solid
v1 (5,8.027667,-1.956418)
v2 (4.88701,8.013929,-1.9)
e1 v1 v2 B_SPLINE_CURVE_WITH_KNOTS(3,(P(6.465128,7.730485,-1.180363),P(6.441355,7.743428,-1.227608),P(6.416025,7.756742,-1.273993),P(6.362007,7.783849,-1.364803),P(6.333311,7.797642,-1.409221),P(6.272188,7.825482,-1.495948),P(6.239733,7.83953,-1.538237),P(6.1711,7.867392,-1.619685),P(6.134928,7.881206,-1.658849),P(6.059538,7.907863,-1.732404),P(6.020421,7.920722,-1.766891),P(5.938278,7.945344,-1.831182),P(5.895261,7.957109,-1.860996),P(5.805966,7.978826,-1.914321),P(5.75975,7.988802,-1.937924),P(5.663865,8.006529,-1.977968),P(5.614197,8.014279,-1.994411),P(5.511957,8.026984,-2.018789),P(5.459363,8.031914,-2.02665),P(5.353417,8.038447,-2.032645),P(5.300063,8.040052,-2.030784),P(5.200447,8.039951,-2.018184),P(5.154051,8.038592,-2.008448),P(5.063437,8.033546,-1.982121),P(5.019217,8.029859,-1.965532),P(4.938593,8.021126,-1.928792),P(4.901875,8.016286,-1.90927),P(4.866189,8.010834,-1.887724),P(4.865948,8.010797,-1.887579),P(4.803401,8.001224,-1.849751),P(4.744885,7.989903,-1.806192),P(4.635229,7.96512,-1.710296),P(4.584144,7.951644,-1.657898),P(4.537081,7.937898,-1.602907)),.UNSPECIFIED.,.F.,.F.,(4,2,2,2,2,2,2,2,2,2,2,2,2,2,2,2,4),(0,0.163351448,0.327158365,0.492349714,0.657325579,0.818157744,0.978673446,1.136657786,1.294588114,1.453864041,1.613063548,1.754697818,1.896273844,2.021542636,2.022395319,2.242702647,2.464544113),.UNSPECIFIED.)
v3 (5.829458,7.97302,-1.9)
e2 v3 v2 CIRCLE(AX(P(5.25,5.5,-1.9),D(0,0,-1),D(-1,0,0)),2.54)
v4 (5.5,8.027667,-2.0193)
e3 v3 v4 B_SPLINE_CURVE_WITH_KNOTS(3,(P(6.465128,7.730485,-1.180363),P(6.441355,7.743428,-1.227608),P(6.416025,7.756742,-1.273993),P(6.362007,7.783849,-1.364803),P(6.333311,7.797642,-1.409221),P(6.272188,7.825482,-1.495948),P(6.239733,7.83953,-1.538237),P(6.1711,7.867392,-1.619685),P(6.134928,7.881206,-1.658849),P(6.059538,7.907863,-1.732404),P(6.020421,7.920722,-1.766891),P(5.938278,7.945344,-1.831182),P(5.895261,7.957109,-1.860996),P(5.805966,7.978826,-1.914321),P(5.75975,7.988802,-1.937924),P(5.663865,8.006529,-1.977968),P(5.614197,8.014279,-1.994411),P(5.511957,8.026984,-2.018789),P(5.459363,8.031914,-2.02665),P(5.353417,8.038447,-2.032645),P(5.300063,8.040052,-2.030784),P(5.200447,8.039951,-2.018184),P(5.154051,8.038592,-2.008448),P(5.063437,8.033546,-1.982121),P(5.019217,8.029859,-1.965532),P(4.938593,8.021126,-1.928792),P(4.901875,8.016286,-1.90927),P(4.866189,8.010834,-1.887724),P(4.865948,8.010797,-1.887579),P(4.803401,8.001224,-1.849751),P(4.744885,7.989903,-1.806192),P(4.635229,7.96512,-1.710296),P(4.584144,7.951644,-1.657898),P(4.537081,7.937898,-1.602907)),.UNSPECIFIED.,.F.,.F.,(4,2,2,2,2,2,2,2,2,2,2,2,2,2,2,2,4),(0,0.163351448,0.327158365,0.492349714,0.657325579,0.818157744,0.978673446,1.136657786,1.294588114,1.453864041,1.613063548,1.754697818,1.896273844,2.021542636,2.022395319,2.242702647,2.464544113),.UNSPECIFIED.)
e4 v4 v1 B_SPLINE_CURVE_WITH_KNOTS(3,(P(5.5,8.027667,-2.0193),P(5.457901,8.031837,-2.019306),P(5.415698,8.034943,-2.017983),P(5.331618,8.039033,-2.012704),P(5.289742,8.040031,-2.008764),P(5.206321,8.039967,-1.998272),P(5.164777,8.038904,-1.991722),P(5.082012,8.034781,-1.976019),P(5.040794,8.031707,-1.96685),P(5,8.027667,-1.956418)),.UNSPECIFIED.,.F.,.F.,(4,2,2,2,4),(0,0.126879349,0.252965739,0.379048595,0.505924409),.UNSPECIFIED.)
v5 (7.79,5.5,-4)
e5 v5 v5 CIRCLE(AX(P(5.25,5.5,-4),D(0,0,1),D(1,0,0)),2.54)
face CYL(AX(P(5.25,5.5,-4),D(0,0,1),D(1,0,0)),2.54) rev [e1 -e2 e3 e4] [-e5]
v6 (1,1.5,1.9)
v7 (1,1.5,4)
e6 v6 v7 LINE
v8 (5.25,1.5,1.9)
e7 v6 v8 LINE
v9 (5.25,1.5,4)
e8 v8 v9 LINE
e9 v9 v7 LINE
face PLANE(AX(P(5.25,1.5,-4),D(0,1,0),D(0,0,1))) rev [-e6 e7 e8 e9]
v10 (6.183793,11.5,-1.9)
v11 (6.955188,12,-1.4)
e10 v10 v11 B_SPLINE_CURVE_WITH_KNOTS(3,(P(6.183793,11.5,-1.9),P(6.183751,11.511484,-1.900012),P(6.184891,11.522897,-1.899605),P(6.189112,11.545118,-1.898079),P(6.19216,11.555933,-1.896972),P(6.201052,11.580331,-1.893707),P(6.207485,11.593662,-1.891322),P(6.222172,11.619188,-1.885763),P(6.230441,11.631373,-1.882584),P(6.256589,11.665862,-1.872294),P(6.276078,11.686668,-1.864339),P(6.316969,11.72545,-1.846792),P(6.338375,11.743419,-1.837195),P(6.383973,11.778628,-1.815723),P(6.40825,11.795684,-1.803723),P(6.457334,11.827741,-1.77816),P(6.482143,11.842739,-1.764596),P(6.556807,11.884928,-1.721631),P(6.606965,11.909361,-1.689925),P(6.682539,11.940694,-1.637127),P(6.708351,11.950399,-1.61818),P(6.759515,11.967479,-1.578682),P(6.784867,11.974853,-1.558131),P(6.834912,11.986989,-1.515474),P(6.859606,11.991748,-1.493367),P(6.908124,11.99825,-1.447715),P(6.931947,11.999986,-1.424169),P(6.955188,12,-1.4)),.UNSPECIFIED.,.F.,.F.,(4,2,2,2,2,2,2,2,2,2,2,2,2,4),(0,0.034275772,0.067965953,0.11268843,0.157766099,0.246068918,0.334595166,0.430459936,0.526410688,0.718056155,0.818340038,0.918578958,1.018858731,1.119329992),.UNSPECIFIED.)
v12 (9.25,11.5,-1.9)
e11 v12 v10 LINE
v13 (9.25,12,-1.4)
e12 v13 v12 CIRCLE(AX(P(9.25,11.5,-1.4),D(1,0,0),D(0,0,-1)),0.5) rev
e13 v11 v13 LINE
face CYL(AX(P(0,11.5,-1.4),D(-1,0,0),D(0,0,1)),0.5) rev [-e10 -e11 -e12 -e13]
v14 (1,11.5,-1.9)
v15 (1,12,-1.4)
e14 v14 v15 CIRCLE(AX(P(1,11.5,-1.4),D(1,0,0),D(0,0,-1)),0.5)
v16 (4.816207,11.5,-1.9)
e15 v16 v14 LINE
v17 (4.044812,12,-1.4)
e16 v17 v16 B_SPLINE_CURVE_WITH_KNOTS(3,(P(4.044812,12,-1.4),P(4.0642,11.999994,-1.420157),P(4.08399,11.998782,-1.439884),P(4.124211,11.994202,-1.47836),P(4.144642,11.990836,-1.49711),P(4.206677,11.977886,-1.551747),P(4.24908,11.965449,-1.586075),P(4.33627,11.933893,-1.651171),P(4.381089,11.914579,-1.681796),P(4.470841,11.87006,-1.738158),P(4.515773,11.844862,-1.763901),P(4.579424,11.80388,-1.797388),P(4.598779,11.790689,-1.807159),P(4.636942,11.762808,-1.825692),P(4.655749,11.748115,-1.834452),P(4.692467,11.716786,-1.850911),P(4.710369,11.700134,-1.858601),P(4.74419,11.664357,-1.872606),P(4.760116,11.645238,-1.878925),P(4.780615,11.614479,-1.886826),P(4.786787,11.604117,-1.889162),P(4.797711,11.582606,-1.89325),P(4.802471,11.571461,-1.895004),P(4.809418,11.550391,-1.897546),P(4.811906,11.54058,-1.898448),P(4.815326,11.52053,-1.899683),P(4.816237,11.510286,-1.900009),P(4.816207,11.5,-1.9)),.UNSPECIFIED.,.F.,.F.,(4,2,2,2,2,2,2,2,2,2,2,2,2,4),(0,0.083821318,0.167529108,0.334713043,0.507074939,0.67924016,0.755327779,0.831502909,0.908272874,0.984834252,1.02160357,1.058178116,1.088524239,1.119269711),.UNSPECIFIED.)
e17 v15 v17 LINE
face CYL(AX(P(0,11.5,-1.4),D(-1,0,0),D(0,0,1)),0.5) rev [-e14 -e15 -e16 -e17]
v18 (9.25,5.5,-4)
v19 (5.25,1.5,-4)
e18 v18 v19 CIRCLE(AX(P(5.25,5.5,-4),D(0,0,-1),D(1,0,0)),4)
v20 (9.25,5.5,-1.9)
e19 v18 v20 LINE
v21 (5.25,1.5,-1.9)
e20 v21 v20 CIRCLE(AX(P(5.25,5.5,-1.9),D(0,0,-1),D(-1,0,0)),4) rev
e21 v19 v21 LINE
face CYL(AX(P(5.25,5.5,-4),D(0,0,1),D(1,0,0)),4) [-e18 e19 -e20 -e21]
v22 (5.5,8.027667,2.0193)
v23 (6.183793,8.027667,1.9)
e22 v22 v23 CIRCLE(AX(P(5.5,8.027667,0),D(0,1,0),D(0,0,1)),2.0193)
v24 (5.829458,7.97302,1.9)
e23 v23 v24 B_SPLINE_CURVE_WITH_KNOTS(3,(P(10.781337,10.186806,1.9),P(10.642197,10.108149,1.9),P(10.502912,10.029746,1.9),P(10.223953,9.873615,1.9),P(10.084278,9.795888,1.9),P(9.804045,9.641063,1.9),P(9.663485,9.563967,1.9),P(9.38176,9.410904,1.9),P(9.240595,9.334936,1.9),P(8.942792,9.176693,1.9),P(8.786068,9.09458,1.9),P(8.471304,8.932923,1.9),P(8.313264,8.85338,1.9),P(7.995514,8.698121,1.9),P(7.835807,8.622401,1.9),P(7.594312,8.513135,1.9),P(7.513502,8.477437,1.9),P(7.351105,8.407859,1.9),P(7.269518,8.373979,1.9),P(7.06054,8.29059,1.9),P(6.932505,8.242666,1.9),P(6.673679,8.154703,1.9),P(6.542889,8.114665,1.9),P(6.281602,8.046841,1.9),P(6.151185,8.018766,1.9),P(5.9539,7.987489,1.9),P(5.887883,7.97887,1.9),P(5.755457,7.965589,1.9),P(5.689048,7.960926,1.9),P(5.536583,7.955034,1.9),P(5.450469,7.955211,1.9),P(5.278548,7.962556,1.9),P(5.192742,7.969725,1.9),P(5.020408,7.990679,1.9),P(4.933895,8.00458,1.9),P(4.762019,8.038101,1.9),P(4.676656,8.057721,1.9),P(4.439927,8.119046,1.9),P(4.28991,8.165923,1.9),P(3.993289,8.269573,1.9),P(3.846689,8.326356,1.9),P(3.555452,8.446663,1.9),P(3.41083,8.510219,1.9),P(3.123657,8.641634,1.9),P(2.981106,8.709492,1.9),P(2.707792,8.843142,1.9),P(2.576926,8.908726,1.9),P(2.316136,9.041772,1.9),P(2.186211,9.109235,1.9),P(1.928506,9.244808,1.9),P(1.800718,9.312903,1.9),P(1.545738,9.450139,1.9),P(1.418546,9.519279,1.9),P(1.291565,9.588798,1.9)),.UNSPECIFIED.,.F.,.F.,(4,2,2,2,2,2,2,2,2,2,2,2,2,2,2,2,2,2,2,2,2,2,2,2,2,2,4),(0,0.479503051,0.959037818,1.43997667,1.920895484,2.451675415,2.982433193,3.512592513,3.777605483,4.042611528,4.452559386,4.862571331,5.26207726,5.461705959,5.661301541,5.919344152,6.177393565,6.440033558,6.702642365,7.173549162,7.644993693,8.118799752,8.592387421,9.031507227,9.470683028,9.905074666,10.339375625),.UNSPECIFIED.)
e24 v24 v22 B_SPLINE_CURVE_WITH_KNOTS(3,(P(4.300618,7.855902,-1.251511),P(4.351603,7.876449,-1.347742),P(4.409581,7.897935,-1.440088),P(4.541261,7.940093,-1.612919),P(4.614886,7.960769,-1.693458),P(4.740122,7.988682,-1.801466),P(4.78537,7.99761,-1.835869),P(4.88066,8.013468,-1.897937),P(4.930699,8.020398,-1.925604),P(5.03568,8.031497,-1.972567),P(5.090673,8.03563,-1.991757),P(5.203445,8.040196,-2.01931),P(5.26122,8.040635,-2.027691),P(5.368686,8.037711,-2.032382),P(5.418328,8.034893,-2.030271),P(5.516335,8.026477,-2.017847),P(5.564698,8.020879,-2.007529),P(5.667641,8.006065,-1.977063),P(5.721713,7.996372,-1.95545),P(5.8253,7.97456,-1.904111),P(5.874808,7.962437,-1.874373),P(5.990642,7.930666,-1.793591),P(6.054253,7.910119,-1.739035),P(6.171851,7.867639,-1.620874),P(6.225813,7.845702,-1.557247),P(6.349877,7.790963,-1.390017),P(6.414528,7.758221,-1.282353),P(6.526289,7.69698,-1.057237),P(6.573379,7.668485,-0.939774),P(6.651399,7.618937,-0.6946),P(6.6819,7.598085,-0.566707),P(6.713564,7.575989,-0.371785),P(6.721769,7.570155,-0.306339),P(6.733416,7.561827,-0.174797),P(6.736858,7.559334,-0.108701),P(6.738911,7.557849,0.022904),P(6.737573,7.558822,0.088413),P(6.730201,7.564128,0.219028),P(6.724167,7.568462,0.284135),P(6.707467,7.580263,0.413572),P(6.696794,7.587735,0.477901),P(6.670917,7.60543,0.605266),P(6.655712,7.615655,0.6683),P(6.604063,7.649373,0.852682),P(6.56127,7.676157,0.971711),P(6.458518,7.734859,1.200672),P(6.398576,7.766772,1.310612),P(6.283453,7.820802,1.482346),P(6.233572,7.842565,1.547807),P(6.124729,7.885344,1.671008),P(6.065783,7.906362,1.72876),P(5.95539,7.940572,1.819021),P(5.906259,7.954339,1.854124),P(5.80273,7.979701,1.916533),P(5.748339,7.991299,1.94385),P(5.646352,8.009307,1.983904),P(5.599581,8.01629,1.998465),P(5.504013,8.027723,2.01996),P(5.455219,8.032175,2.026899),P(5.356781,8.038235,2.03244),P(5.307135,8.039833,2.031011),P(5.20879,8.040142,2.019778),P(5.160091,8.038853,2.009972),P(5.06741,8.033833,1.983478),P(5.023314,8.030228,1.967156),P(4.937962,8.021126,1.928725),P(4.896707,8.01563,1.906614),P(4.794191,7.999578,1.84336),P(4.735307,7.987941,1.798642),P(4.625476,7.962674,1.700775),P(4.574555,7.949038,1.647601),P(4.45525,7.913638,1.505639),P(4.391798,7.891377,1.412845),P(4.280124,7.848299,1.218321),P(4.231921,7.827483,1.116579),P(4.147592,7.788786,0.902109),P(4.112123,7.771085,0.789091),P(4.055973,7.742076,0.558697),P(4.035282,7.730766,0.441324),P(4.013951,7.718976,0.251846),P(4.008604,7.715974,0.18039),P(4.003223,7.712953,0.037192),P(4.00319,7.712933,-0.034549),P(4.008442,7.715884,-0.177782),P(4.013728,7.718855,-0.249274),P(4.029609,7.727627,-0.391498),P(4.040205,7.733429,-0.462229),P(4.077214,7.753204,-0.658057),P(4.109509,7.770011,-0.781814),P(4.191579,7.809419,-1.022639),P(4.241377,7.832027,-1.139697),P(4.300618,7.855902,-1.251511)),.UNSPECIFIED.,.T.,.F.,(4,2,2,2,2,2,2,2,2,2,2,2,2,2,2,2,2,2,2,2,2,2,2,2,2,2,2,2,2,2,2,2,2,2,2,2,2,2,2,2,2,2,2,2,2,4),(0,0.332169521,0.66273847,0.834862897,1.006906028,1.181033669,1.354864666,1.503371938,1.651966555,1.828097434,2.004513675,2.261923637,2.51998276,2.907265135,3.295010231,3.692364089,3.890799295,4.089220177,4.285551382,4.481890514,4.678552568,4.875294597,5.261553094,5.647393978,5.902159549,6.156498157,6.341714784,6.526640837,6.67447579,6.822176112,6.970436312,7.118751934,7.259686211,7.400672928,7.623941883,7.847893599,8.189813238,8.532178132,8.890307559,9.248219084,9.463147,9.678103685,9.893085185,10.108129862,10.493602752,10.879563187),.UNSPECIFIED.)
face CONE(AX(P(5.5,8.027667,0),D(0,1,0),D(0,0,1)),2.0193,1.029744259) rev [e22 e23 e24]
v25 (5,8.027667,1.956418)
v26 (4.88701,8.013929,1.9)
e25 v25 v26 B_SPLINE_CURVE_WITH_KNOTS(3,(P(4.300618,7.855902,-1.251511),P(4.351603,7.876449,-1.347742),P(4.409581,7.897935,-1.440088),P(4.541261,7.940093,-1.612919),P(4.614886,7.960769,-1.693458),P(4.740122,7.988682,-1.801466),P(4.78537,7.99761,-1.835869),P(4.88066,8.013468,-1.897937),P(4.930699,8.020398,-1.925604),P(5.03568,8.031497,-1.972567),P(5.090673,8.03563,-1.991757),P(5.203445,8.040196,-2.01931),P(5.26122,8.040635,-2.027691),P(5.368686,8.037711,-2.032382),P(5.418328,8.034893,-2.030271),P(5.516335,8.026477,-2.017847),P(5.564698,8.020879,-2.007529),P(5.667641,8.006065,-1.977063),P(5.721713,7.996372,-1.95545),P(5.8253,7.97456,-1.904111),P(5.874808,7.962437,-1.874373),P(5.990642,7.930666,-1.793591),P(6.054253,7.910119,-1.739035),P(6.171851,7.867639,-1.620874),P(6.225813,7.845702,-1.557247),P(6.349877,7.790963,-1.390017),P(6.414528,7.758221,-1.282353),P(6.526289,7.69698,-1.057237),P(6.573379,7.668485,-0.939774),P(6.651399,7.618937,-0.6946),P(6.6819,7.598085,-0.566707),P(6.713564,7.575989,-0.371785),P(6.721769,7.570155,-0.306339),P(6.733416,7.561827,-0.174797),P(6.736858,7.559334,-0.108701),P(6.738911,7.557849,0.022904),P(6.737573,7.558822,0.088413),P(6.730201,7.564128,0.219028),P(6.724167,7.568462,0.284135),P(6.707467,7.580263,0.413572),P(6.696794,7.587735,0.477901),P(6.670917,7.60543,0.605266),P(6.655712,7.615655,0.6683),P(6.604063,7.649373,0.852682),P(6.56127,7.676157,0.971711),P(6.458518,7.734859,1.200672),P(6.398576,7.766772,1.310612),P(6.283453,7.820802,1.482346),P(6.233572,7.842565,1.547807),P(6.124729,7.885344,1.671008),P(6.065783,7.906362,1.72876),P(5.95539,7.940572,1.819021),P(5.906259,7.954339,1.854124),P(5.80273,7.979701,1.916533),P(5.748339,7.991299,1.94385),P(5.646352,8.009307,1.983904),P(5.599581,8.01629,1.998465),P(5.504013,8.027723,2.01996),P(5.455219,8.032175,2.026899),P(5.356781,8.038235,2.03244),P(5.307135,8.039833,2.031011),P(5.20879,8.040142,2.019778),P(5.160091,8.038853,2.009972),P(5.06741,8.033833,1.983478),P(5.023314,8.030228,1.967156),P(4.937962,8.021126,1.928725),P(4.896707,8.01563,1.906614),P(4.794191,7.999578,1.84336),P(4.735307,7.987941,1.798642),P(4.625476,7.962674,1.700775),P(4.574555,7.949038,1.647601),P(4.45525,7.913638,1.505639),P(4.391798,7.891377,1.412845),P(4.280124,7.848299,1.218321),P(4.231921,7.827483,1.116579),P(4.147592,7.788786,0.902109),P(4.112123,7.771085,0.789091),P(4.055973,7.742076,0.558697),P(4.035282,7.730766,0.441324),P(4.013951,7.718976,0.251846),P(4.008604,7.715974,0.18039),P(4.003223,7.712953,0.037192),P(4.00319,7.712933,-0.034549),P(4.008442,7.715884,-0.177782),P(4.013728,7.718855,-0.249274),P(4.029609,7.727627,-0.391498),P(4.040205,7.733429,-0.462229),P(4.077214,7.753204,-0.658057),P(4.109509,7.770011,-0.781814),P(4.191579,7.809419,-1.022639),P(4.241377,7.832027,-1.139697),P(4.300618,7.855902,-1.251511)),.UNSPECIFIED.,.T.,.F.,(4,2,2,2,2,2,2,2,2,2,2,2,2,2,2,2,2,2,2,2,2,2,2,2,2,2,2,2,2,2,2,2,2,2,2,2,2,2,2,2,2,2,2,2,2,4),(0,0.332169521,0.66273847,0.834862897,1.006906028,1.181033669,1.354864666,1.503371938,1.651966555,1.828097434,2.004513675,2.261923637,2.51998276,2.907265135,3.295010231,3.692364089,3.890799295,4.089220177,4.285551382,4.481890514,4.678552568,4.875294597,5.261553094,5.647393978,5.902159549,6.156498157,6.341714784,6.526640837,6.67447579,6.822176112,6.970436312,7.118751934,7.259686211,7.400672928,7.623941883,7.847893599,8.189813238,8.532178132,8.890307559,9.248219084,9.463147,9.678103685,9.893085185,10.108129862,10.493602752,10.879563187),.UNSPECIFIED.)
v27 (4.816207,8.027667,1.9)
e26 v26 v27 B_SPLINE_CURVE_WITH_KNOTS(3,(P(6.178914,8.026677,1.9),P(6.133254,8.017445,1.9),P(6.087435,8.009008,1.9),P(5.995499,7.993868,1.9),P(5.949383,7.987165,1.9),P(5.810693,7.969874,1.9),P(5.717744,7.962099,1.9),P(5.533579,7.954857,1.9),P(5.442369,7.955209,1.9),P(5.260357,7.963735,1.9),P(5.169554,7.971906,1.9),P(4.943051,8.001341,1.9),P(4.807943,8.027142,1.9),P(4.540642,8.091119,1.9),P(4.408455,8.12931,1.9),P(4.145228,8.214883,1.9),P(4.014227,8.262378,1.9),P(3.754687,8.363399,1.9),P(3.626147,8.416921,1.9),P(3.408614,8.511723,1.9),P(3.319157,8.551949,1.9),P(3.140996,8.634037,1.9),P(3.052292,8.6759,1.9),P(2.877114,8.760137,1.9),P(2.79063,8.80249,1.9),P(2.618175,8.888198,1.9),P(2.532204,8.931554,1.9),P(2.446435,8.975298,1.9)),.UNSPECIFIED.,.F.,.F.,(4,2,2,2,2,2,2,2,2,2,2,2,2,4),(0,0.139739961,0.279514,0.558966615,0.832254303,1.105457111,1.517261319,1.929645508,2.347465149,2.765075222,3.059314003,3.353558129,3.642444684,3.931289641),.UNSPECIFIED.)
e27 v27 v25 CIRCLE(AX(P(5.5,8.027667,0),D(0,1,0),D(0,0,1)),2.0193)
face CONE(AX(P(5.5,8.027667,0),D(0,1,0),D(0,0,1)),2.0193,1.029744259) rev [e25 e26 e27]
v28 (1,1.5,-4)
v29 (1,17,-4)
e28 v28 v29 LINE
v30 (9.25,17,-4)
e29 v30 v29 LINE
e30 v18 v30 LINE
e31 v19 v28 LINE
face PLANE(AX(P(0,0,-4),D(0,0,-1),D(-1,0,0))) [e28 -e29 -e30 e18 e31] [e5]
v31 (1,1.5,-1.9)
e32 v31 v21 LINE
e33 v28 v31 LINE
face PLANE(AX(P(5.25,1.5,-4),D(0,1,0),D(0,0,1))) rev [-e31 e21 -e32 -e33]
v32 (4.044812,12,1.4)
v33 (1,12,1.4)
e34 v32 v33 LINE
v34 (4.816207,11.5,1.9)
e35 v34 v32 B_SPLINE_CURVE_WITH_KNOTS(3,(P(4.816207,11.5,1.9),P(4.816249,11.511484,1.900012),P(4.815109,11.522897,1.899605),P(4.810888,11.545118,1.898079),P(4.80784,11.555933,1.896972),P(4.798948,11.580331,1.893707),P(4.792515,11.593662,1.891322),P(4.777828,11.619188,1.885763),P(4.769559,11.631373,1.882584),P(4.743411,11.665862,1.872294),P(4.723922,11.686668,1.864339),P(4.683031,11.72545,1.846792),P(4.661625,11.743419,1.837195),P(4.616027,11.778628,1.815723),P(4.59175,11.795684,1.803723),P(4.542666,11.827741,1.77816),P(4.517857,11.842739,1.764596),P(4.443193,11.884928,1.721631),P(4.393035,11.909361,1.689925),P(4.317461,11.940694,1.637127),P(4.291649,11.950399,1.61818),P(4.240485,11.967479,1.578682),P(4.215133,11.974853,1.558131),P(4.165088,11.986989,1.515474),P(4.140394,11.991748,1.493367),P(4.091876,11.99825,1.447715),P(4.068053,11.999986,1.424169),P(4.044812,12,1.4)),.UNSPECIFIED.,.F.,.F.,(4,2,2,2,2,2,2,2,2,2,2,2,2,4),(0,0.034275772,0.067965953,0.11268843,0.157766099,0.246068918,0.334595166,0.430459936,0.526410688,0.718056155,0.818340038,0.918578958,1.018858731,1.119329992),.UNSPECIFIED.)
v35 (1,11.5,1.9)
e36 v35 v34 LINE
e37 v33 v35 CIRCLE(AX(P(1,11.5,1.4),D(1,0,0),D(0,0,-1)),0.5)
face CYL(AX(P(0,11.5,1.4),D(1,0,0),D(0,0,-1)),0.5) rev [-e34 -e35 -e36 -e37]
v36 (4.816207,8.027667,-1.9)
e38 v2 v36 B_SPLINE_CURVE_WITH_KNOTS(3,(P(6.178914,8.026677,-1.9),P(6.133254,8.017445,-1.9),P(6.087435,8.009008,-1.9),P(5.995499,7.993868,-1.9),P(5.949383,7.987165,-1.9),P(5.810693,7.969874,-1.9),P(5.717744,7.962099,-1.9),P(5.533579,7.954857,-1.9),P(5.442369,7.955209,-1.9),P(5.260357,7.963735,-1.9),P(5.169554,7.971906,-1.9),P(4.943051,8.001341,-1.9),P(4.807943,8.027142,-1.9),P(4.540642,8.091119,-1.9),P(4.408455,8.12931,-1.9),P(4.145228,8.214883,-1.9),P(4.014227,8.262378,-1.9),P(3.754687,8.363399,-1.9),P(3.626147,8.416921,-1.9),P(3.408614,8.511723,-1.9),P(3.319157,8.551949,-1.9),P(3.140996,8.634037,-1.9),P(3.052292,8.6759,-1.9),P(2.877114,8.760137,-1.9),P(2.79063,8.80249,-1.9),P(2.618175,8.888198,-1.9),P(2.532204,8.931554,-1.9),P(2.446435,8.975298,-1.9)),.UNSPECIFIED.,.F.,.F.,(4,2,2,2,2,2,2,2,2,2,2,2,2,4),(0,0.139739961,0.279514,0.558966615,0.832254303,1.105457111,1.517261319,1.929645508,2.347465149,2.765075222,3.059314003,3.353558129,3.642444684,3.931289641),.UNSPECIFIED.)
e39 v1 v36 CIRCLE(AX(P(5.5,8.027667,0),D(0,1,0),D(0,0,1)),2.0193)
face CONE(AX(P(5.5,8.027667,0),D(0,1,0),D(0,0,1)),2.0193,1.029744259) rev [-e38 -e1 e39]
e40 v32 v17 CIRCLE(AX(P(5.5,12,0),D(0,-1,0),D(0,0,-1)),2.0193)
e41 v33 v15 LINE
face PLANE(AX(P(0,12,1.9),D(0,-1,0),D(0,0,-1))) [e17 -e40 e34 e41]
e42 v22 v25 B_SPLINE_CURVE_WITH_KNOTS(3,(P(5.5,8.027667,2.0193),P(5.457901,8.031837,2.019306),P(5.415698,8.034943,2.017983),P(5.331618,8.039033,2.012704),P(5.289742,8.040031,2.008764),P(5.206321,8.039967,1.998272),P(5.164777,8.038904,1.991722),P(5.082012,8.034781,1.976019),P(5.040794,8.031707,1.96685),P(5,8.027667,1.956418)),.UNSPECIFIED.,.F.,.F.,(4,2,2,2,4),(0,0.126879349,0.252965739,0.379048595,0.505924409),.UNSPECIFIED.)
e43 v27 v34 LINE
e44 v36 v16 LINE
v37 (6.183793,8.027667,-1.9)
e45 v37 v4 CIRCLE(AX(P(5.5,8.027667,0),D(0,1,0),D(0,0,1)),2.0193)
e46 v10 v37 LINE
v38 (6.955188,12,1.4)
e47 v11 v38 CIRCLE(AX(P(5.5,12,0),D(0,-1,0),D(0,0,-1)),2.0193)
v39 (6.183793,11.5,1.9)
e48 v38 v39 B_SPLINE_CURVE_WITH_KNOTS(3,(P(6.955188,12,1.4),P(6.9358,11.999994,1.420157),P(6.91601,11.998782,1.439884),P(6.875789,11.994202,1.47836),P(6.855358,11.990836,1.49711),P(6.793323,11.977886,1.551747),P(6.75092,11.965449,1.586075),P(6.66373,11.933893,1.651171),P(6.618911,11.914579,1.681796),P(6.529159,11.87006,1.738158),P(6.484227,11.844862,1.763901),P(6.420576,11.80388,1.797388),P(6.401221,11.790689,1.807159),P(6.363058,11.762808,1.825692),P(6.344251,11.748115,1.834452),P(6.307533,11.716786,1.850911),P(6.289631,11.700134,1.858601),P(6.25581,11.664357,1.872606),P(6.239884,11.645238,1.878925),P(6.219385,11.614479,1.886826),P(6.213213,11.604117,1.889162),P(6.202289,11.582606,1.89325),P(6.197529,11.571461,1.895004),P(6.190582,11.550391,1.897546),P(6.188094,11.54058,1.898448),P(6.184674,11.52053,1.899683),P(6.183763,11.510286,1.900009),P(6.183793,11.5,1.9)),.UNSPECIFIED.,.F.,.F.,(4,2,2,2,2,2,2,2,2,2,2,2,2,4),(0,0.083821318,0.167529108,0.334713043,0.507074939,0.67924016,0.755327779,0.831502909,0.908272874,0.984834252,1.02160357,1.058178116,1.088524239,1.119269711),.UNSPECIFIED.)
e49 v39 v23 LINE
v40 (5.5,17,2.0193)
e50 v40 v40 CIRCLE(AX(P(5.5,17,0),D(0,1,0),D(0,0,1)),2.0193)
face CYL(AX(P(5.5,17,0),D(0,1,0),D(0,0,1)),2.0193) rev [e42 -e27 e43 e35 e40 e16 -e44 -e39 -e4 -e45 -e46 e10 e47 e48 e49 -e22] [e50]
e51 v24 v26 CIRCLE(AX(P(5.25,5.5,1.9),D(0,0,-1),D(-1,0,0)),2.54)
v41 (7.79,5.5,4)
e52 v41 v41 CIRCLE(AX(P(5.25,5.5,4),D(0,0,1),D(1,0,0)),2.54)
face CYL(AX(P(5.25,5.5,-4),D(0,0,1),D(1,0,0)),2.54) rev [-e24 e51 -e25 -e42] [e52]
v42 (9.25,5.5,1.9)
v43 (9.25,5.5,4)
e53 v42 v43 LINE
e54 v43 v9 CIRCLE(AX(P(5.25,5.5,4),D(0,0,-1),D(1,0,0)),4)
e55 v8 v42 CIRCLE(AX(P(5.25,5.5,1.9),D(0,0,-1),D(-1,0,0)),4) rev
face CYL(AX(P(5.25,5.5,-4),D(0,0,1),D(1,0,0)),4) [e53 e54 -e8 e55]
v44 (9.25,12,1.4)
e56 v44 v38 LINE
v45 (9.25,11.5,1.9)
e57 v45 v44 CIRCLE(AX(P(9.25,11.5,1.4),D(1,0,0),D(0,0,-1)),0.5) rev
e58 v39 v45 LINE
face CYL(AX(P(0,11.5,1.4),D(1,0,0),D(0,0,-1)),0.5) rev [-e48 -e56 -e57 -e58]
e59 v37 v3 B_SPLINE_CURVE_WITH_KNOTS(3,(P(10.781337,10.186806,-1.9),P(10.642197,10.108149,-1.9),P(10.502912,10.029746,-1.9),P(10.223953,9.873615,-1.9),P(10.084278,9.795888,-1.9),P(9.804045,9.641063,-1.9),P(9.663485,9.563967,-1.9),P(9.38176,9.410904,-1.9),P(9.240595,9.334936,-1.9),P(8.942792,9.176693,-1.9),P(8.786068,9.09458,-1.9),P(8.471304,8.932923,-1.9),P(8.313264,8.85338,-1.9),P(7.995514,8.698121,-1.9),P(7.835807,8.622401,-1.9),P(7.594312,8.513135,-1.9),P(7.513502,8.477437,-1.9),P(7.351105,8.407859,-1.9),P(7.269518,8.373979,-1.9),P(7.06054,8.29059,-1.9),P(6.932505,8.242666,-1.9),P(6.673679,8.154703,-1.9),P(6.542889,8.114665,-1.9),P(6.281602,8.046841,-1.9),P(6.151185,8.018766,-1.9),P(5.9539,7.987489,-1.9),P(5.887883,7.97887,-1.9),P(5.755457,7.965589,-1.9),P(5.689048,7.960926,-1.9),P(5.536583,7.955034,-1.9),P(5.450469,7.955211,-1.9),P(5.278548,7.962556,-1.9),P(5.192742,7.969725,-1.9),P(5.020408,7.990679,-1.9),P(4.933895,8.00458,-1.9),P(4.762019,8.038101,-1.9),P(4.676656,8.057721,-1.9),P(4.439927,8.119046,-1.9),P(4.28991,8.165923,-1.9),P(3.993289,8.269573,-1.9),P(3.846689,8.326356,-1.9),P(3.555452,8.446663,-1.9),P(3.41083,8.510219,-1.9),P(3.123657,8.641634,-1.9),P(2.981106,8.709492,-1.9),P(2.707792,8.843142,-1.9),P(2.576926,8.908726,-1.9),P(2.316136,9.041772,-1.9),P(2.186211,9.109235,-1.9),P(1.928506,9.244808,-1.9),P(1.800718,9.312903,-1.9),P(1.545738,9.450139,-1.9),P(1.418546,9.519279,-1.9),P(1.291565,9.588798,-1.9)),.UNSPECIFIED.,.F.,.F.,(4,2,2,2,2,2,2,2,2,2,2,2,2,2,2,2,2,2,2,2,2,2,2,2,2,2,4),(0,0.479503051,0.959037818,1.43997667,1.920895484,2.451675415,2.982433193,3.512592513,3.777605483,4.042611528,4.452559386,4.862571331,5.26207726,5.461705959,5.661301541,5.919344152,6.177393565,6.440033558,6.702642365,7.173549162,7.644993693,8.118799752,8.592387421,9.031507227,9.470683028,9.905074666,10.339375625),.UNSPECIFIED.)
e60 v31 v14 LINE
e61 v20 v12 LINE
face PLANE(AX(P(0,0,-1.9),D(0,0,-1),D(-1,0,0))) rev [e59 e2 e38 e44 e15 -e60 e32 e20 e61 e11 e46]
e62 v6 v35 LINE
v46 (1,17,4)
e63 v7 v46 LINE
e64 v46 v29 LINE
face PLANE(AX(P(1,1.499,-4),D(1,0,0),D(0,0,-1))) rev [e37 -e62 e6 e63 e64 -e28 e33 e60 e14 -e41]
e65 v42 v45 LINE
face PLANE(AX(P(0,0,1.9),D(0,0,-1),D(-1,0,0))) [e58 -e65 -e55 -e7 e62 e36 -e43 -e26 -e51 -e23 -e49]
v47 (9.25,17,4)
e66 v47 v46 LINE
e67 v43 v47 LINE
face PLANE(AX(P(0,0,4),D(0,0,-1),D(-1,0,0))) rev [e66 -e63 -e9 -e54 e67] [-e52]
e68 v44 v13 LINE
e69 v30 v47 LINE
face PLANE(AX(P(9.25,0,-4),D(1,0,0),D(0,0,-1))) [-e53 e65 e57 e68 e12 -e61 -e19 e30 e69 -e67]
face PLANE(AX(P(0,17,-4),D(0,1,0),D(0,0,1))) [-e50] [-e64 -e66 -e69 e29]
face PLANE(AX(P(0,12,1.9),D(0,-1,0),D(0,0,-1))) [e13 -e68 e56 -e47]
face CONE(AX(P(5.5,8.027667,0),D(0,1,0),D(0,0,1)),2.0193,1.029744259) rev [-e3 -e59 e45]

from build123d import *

# Parameters (mm, degrees)
BOSS_EXTRUDE1_DEPTH      = 4
BOSS_EXTRUDE1_DEPTH_BACK = 4
SKETCH1_W                = 9.25
SKETCH1_H                = 17
CUT_EXTRUDE1_DEPTH       = 1.9
CUT_EXTRUDE1_DEPTH_BACK  = 1.9
SKETCH2_W                = 9.25
SKETCH2_H                = 12
SKETCH3_R                = 2.54
CUT_EXTRUDE2_DEPTH       = 21.941883869
FILLET1_R                = 0.5
CUT_EXTRUDE5_DEPTH       = 21.941884033
CUT_EXTRUDE6_REACH       = 20.488
SKETCH9_W                = 1.000000032
SKETCH9_H                = 8


# Read off the part's stored shape, not the designer's step: #10-32 Tapped Hole1
with BuildPart() as part:
    # Sketch1 → Boss-Extrude1 (new, two sides: drawn at the far end of the back side and taken through both)
    with BuildSketch(Plane.XY.offset(-BOSS_EXTRUDE1_DEPTH_BACK)):
        with Locations((4.625, 8.5)):
            Rectangle(SKETCH1_W, SKETCH1_H)
    extrude(amount=BOSS_EXTRUDE1_DEPTH + BOSS_EXTRUDE1_DEPTH_BACK)

    # Sketch2 → Cut-Extrude1 (cut, two sides: drawn at the far end of the back side and taken through both)
    with BuildSketch(Plane.XY.offset(-CUT_EXTRUDE1_DEPTH_BACK)):
        with Locations((4.625, 6)):
            Rectangle(SKETCH2_W, SKETCH2_H)
    extrude(amount=CUT_EXTRUDE1_DEPTH + CUT_EXTRUDE1_DEPTH_BACK, mode=Mode.SUBTRACT)

    # Sketch3 → Cut-Extrude2 (cut, through all)
    with BuildSketch(Plane.XY.offset(4)):
        with Locations((5.25, 5.5)):
            Circle(SKETCH3_R)
    extrude(amount=-CUT_EXTRUDE2_DEPTH, mode=Mode.SUBTRACT)

    # #10-32 Tapped Hole1 outline → #10-32 Tapped Hole1 (revolve, cut)
    with BuildSketch(Plane(origin=(5.5, 0, 0), x_dir=(1, 0, 0), z_dir=(0, 0, 1))):
        Polygon((0, 7.973018958), (1.928351252, 7.973018958), (2.019302964, 8.027668689), (2.0193, 17), (0, 17), align=None)
    revolve(axis=Axis((5.5, 0, 0), (0, 1, 0)), mode=Mode.SUBTRACT)

    # Fillet1
    fillet1_edges = [part.edges().sort_by_distance(p)[0] for p in [
        (7.716900739, 12, -1.9),
        (7.716900739, 12, 1.9),
        (2.408099261, 12, -1.9),
        (2.408099261, 12, 1.9),
    ]]
    fillet(fillet1_edges, radius=FILLET1_R)

    # Sketch7 → Cut-Extrude5 (cut, through all)
    with BuildSketch(Plane.XY.offset(4)):
        with BuildLine():
            Line((5.25, 1.5), (0, 1.5))
            Line((0, 1.5), (0, 0))
            Line((0, 0), (9.25, 0))
            Line((9.25, 0), (9.25, 5.5))
            ThreePointArc((9.25, 5.5), (8.078427125, 2.671572875), (5.25, 1.5))
        make_face()
    extrude(amount=-CUT_EXTRUDE5_DEPTH, mode=Mode.SUBTRACT)

    # Sketch9 → Cut-Extrude6 (cut, up to next)
    with BuildSketch(Plane(origin=(0, 17, 0), x_dir=(1, 0, 0), z_dir=(0, 1, 0)), mode=Mode.PRIVATE) as cut_extrude6_sk1:
        with Locations((0.500000016, 0)):
            Rectangle(SKETCH9_W, SKETCH9_H)
    cut_extrude6_tool1 = extrude(cut_extrude6_sk1.sketch, amount=-CUT_EXTRUDE6_REACH, mode=Mode.PRIVATE) & part.part
    add(cut_extrude6_tool1.solids().sort_by_distance((0.5, 17, 0))[0], mode=Mode.SUBTRACT)


solid = part.part
